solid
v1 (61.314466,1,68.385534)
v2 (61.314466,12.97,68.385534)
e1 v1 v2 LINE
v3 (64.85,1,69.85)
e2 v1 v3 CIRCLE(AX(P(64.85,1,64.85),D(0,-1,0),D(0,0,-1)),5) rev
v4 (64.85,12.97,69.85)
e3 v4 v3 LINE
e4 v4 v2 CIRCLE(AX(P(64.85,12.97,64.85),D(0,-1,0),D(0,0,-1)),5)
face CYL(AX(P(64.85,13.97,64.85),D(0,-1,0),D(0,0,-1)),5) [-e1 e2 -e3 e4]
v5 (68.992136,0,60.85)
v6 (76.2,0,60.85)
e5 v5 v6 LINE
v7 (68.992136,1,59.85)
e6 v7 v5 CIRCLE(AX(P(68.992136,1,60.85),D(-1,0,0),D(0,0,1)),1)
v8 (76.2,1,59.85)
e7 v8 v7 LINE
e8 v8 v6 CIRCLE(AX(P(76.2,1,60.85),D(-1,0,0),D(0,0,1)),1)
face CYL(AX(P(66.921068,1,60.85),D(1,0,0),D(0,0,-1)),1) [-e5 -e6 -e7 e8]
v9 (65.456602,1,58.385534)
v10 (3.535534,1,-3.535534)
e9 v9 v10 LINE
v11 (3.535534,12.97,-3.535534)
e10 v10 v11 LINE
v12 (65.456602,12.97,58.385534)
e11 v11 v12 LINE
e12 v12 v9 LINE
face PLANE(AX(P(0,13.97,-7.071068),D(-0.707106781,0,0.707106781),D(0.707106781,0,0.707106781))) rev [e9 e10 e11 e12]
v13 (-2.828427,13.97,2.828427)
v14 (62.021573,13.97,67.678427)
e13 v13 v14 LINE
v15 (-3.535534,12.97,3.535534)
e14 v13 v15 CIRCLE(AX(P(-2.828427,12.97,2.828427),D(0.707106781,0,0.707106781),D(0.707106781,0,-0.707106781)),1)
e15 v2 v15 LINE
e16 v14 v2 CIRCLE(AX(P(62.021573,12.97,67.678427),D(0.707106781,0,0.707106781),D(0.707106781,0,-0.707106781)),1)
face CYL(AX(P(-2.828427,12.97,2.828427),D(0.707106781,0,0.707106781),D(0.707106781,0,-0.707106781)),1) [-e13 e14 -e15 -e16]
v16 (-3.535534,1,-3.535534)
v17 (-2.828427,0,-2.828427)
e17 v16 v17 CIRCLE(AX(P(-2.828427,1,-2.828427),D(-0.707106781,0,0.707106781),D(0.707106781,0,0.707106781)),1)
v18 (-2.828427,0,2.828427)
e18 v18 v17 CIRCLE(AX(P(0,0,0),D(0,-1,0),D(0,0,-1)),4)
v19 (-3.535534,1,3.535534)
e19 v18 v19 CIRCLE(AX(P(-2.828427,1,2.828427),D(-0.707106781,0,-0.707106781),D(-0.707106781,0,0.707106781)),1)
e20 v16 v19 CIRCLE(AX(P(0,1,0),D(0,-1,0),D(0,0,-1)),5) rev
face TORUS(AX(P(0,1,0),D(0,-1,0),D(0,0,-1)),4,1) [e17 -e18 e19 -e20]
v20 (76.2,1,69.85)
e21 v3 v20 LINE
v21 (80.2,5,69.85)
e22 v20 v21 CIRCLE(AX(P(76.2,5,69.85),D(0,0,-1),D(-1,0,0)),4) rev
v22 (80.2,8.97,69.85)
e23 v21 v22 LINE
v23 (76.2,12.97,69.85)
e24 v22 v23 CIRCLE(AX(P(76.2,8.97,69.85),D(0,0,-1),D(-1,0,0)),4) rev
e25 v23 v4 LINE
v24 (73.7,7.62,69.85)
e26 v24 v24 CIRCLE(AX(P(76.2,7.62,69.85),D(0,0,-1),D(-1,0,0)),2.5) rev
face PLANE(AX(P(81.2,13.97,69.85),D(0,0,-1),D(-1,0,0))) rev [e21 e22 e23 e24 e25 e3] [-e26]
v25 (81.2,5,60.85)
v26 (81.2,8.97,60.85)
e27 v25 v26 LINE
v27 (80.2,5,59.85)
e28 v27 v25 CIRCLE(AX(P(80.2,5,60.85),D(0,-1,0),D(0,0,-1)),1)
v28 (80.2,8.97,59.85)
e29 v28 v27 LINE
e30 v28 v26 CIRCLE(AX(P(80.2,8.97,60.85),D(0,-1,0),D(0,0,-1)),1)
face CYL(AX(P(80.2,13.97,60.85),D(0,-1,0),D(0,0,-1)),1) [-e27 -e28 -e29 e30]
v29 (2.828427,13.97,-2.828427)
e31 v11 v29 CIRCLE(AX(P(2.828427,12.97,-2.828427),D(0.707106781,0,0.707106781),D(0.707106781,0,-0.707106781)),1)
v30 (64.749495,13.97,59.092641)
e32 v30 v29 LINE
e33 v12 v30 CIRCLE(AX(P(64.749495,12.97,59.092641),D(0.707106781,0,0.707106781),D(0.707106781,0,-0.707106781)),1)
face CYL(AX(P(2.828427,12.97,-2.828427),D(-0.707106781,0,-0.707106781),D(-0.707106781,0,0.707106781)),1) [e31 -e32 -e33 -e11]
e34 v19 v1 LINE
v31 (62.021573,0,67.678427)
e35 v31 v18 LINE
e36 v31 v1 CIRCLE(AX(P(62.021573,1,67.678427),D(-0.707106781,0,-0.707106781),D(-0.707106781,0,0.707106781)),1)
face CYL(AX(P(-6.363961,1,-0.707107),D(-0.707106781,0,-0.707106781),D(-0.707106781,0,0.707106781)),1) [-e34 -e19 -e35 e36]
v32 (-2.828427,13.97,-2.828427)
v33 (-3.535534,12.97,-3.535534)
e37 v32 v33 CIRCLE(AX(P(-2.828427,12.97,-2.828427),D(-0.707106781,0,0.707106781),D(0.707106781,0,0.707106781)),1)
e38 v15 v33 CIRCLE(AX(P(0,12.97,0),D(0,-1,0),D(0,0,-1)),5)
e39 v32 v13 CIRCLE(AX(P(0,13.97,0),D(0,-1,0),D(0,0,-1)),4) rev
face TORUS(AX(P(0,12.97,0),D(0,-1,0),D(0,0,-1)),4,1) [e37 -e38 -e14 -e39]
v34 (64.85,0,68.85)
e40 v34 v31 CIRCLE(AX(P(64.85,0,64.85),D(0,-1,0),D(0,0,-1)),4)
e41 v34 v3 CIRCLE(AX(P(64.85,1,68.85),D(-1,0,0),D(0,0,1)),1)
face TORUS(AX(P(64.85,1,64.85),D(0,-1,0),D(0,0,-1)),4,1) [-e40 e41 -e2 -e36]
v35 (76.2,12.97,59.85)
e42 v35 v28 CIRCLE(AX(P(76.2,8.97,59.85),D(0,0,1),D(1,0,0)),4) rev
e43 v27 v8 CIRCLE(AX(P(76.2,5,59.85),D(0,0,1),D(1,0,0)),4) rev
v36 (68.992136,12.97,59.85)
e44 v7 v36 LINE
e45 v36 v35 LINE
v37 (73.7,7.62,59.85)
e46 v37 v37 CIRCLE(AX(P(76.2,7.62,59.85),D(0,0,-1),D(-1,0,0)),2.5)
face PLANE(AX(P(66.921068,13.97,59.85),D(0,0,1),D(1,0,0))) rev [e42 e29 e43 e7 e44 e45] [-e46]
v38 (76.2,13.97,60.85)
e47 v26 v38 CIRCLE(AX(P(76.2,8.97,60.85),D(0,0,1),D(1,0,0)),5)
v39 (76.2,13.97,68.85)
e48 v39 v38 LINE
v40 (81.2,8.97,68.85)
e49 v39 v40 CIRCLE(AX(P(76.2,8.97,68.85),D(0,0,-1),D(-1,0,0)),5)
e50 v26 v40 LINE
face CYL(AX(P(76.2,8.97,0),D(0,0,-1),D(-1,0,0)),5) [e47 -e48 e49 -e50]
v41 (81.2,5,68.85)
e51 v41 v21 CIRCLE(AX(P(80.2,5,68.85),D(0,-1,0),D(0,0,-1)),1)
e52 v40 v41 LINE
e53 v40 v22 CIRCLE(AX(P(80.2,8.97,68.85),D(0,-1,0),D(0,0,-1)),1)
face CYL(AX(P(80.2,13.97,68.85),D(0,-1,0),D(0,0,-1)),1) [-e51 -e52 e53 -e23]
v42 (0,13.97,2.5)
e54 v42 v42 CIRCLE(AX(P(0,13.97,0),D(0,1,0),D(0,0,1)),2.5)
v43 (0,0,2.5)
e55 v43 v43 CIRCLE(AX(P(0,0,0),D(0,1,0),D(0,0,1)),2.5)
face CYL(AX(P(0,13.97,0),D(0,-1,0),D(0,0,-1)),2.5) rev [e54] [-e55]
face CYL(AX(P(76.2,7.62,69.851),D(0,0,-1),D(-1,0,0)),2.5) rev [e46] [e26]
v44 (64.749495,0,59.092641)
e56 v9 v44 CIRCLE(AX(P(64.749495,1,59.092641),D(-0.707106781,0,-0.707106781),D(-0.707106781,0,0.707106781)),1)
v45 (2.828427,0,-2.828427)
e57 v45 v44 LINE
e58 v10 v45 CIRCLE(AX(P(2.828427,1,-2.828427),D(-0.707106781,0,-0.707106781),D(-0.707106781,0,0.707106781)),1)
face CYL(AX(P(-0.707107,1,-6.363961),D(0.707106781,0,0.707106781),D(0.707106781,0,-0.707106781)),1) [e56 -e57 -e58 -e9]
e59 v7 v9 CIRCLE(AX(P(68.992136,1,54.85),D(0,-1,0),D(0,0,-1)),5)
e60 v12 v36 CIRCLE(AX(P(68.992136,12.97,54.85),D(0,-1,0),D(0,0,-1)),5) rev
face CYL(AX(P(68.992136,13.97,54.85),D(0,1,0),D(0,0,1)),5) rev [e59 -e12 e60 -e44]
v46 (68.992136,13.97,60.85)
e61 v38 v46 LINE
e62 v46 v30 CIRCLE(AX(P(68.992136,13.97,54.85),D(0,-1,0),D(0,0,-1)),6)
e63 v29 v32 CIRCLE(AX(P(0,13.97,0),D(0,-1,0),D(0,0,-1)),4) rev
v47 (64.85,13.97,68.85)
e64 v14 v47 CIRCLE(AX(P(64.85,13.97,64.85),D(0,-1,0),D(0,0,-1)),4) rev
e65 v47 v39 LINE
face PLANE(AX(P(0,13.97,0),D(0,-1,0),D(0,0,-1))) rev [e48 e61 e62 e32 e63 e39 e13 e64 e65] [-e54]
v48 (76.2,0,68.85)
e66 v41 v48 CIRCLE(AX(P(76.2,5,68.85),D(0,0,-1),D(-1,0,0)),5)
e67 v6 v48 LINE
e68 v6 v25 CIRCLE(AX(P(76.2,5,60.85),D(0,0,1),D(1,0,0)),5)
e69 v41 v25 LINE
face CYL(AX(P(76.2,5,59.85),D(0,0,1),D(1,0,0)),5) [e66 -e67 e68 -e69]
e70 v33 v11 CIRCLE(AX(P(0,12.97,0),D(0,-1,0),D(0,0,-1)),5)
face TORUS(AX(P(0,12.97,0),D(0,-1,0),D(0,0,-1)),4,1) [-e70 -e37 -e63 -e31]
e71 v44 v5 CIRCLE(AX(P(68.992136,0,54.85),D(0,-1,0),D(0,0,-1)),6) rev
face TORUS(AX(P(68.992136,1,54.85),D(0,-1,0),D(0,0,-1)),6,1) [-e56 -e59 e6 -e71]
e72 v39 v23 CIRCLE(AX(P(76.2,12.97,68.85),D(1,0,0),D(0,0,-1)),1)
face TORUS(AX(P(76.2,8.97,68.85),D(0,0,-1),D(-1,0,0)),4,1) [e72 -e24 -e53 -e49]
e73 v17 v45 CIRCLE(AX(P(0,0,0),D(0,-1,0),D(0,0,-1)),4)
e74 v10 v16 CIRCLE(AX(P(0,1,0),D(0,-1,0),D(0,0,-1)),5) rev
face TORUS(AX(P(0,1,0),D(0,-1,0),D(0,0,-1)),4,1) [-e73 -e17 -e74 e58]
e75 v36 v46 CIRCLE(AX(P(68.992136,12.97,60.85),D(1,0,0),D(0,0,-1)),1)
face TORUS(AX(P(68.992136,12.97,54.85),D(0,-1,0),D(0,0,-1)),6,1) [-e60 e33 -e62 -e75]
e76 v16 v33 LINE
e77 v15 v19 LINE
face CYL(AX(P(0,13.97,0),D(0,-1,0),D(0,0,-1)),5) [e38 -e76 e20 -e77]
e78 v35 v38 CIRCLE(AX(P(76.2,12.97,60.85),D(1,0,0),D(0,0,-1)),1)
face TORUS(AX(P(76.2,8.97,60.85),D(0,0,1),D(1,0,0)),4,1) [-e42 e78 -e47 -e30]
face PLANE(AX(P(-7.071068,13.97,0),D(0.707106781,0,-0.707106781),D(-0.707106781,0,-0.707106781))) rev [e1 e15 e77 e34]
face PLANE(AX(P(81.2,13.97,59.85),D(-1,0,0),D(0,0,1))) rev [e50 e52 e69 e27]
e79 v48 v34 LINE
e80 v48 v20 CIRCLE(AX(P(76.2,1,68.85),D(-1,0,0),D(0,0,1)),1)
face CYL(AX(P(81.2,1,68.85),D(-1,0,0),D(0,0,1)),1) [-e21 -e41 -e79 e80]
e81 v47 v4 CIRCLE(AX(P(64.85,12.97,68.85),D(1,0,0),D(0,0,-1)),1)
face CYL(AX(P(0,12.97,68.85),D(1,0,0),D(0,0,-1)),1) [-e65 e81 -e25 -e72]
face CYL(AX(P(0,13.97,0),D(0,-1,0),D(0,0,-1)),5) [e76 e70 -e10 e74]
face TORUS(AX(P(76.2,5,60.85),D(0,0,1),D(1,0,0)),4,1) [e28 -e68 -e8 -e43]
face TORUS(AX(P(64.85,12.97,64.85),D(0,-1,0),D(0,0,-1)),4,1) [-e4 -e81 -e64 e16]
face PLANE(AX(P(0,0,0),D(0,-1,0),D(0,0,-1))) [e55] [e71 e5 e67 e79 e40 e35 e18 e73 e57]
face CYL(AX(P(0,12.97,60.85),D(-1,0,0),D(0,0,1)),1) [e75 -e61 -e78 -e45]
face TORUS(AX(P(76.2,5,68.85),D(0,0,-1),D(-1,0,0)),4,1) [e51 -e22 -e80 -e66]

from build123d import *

# Parameters (mm, degrees)
SKETCH1_R           = 2.5
BOSS_EXTRUDE1_DEPTH = 13.97
CUT_EXTRUDE1_REACH  = 108.146
SKETCH2_R           = 2.5
FILLET1_R           = 5
FILLET2_R           = 1


with BuildPart() as part:
    # Sketch1 → Boss-Extrude1 (new body)
    with BuildSketch(Plane(origin=(0, 0, 0), x_dir=(1, 0, 0), z_dir=(0, 1, 0))):
        Polygon((0, 7.071067812), (-7.071067812, 0), (62.778932188, -69.85), (81.2, -69.85), (81.2, -59.85), (66.921067812, -59.85), align=None)
        with Locations(Location((0, 0, 0), (0, 0, 270))):
            Circle(SKETCH1_R, mode=Mode.SUBTRACT)
    extrude(amount=BOSS_EXTRUDE1_DEPTH)

    # Sketch2 → Cut-Extrude1 (cut, up to next)
    with BuildSketch(Plane(origin=(0, 0, 59.85), x_dir=(-1, 0, 0), z_dir=(0, 0, -1)), mode=Mode.PRIVATE) as cut_extrude1_sk1:
        with Locations((-76.2, 7.62)):
            Circle(SKETCH2_R)
    cut_extrude1_tool1 = extrude(cut_extrude1_sk1.sketch, amount=-CUT_EXTRUDE1_REACH, mode=Mode.PRIVATE) & part.part
    add(cut_extrude1_tool1.solids().sort_by_distance((76.2, 7.62, 59.85))[0], mode=Mode.SUBTRACT)

    # Fillet1
    fillet1_edges = [part.edges().sort_by_distance(p)[0] for p in [
        (0, 6.985, -7.071067812),
        (-7.071067812, 6.985, 0),
        (81.2, 0, 64.85),
        (81.2, 13.97, 64.85),
        (62.778932188, 6.985, 69.85),
        (66.921067812, 6.985, 59.85),
    ]]
    fillet(fillet1_edges, radius=FILLET1_R - 0.0001)  # a hair under: the kernel refuses the full size

    # Fillet2
    fillet2_edges = [part.edges().sort_by_distance(p)[0] for p in [
        (70.525029289, 0, 69.85),
        (28.889445383, 0, 35.960513195),
        (34.496047101, 0, 27.424979289),
        (72.596097101, 0, 59.85),
        (62.936579685, 0, 69.469405275),
        (-5.000041421, 0, 0),
        (0, 0, -5.000041421),
        (34.496047101, 13.97, 27.424979289),
        (72.596097101, 13.97, 59.85),
        (28.889445383, 13.97, 35.960513195),
        (70.525029289, 13.97, 69.85),
        (62.936579685, 13.97, 69.469405275),
        (-5.000041421, 13.97, 0),
        (0, 13.97, -5.000041421),
        (81.2, 6.985, 59.85),
        (81.2, 6.985, 69.85),
        (79.735563195, 12.505563195, 59.85),
        (79.735563195, 1.464436805, 59.85),
        (79.735563195, 12.505563195, 69.85),
        (79.735563195, 1.464436805, 69.85),
        (67.078715309, 0, 59.469405275),
        (67.078715309, 13.97, 59.469405275),
    ]]
    fillet(fillet2_edges, radius=FILLET2_R)


solid = part.part
